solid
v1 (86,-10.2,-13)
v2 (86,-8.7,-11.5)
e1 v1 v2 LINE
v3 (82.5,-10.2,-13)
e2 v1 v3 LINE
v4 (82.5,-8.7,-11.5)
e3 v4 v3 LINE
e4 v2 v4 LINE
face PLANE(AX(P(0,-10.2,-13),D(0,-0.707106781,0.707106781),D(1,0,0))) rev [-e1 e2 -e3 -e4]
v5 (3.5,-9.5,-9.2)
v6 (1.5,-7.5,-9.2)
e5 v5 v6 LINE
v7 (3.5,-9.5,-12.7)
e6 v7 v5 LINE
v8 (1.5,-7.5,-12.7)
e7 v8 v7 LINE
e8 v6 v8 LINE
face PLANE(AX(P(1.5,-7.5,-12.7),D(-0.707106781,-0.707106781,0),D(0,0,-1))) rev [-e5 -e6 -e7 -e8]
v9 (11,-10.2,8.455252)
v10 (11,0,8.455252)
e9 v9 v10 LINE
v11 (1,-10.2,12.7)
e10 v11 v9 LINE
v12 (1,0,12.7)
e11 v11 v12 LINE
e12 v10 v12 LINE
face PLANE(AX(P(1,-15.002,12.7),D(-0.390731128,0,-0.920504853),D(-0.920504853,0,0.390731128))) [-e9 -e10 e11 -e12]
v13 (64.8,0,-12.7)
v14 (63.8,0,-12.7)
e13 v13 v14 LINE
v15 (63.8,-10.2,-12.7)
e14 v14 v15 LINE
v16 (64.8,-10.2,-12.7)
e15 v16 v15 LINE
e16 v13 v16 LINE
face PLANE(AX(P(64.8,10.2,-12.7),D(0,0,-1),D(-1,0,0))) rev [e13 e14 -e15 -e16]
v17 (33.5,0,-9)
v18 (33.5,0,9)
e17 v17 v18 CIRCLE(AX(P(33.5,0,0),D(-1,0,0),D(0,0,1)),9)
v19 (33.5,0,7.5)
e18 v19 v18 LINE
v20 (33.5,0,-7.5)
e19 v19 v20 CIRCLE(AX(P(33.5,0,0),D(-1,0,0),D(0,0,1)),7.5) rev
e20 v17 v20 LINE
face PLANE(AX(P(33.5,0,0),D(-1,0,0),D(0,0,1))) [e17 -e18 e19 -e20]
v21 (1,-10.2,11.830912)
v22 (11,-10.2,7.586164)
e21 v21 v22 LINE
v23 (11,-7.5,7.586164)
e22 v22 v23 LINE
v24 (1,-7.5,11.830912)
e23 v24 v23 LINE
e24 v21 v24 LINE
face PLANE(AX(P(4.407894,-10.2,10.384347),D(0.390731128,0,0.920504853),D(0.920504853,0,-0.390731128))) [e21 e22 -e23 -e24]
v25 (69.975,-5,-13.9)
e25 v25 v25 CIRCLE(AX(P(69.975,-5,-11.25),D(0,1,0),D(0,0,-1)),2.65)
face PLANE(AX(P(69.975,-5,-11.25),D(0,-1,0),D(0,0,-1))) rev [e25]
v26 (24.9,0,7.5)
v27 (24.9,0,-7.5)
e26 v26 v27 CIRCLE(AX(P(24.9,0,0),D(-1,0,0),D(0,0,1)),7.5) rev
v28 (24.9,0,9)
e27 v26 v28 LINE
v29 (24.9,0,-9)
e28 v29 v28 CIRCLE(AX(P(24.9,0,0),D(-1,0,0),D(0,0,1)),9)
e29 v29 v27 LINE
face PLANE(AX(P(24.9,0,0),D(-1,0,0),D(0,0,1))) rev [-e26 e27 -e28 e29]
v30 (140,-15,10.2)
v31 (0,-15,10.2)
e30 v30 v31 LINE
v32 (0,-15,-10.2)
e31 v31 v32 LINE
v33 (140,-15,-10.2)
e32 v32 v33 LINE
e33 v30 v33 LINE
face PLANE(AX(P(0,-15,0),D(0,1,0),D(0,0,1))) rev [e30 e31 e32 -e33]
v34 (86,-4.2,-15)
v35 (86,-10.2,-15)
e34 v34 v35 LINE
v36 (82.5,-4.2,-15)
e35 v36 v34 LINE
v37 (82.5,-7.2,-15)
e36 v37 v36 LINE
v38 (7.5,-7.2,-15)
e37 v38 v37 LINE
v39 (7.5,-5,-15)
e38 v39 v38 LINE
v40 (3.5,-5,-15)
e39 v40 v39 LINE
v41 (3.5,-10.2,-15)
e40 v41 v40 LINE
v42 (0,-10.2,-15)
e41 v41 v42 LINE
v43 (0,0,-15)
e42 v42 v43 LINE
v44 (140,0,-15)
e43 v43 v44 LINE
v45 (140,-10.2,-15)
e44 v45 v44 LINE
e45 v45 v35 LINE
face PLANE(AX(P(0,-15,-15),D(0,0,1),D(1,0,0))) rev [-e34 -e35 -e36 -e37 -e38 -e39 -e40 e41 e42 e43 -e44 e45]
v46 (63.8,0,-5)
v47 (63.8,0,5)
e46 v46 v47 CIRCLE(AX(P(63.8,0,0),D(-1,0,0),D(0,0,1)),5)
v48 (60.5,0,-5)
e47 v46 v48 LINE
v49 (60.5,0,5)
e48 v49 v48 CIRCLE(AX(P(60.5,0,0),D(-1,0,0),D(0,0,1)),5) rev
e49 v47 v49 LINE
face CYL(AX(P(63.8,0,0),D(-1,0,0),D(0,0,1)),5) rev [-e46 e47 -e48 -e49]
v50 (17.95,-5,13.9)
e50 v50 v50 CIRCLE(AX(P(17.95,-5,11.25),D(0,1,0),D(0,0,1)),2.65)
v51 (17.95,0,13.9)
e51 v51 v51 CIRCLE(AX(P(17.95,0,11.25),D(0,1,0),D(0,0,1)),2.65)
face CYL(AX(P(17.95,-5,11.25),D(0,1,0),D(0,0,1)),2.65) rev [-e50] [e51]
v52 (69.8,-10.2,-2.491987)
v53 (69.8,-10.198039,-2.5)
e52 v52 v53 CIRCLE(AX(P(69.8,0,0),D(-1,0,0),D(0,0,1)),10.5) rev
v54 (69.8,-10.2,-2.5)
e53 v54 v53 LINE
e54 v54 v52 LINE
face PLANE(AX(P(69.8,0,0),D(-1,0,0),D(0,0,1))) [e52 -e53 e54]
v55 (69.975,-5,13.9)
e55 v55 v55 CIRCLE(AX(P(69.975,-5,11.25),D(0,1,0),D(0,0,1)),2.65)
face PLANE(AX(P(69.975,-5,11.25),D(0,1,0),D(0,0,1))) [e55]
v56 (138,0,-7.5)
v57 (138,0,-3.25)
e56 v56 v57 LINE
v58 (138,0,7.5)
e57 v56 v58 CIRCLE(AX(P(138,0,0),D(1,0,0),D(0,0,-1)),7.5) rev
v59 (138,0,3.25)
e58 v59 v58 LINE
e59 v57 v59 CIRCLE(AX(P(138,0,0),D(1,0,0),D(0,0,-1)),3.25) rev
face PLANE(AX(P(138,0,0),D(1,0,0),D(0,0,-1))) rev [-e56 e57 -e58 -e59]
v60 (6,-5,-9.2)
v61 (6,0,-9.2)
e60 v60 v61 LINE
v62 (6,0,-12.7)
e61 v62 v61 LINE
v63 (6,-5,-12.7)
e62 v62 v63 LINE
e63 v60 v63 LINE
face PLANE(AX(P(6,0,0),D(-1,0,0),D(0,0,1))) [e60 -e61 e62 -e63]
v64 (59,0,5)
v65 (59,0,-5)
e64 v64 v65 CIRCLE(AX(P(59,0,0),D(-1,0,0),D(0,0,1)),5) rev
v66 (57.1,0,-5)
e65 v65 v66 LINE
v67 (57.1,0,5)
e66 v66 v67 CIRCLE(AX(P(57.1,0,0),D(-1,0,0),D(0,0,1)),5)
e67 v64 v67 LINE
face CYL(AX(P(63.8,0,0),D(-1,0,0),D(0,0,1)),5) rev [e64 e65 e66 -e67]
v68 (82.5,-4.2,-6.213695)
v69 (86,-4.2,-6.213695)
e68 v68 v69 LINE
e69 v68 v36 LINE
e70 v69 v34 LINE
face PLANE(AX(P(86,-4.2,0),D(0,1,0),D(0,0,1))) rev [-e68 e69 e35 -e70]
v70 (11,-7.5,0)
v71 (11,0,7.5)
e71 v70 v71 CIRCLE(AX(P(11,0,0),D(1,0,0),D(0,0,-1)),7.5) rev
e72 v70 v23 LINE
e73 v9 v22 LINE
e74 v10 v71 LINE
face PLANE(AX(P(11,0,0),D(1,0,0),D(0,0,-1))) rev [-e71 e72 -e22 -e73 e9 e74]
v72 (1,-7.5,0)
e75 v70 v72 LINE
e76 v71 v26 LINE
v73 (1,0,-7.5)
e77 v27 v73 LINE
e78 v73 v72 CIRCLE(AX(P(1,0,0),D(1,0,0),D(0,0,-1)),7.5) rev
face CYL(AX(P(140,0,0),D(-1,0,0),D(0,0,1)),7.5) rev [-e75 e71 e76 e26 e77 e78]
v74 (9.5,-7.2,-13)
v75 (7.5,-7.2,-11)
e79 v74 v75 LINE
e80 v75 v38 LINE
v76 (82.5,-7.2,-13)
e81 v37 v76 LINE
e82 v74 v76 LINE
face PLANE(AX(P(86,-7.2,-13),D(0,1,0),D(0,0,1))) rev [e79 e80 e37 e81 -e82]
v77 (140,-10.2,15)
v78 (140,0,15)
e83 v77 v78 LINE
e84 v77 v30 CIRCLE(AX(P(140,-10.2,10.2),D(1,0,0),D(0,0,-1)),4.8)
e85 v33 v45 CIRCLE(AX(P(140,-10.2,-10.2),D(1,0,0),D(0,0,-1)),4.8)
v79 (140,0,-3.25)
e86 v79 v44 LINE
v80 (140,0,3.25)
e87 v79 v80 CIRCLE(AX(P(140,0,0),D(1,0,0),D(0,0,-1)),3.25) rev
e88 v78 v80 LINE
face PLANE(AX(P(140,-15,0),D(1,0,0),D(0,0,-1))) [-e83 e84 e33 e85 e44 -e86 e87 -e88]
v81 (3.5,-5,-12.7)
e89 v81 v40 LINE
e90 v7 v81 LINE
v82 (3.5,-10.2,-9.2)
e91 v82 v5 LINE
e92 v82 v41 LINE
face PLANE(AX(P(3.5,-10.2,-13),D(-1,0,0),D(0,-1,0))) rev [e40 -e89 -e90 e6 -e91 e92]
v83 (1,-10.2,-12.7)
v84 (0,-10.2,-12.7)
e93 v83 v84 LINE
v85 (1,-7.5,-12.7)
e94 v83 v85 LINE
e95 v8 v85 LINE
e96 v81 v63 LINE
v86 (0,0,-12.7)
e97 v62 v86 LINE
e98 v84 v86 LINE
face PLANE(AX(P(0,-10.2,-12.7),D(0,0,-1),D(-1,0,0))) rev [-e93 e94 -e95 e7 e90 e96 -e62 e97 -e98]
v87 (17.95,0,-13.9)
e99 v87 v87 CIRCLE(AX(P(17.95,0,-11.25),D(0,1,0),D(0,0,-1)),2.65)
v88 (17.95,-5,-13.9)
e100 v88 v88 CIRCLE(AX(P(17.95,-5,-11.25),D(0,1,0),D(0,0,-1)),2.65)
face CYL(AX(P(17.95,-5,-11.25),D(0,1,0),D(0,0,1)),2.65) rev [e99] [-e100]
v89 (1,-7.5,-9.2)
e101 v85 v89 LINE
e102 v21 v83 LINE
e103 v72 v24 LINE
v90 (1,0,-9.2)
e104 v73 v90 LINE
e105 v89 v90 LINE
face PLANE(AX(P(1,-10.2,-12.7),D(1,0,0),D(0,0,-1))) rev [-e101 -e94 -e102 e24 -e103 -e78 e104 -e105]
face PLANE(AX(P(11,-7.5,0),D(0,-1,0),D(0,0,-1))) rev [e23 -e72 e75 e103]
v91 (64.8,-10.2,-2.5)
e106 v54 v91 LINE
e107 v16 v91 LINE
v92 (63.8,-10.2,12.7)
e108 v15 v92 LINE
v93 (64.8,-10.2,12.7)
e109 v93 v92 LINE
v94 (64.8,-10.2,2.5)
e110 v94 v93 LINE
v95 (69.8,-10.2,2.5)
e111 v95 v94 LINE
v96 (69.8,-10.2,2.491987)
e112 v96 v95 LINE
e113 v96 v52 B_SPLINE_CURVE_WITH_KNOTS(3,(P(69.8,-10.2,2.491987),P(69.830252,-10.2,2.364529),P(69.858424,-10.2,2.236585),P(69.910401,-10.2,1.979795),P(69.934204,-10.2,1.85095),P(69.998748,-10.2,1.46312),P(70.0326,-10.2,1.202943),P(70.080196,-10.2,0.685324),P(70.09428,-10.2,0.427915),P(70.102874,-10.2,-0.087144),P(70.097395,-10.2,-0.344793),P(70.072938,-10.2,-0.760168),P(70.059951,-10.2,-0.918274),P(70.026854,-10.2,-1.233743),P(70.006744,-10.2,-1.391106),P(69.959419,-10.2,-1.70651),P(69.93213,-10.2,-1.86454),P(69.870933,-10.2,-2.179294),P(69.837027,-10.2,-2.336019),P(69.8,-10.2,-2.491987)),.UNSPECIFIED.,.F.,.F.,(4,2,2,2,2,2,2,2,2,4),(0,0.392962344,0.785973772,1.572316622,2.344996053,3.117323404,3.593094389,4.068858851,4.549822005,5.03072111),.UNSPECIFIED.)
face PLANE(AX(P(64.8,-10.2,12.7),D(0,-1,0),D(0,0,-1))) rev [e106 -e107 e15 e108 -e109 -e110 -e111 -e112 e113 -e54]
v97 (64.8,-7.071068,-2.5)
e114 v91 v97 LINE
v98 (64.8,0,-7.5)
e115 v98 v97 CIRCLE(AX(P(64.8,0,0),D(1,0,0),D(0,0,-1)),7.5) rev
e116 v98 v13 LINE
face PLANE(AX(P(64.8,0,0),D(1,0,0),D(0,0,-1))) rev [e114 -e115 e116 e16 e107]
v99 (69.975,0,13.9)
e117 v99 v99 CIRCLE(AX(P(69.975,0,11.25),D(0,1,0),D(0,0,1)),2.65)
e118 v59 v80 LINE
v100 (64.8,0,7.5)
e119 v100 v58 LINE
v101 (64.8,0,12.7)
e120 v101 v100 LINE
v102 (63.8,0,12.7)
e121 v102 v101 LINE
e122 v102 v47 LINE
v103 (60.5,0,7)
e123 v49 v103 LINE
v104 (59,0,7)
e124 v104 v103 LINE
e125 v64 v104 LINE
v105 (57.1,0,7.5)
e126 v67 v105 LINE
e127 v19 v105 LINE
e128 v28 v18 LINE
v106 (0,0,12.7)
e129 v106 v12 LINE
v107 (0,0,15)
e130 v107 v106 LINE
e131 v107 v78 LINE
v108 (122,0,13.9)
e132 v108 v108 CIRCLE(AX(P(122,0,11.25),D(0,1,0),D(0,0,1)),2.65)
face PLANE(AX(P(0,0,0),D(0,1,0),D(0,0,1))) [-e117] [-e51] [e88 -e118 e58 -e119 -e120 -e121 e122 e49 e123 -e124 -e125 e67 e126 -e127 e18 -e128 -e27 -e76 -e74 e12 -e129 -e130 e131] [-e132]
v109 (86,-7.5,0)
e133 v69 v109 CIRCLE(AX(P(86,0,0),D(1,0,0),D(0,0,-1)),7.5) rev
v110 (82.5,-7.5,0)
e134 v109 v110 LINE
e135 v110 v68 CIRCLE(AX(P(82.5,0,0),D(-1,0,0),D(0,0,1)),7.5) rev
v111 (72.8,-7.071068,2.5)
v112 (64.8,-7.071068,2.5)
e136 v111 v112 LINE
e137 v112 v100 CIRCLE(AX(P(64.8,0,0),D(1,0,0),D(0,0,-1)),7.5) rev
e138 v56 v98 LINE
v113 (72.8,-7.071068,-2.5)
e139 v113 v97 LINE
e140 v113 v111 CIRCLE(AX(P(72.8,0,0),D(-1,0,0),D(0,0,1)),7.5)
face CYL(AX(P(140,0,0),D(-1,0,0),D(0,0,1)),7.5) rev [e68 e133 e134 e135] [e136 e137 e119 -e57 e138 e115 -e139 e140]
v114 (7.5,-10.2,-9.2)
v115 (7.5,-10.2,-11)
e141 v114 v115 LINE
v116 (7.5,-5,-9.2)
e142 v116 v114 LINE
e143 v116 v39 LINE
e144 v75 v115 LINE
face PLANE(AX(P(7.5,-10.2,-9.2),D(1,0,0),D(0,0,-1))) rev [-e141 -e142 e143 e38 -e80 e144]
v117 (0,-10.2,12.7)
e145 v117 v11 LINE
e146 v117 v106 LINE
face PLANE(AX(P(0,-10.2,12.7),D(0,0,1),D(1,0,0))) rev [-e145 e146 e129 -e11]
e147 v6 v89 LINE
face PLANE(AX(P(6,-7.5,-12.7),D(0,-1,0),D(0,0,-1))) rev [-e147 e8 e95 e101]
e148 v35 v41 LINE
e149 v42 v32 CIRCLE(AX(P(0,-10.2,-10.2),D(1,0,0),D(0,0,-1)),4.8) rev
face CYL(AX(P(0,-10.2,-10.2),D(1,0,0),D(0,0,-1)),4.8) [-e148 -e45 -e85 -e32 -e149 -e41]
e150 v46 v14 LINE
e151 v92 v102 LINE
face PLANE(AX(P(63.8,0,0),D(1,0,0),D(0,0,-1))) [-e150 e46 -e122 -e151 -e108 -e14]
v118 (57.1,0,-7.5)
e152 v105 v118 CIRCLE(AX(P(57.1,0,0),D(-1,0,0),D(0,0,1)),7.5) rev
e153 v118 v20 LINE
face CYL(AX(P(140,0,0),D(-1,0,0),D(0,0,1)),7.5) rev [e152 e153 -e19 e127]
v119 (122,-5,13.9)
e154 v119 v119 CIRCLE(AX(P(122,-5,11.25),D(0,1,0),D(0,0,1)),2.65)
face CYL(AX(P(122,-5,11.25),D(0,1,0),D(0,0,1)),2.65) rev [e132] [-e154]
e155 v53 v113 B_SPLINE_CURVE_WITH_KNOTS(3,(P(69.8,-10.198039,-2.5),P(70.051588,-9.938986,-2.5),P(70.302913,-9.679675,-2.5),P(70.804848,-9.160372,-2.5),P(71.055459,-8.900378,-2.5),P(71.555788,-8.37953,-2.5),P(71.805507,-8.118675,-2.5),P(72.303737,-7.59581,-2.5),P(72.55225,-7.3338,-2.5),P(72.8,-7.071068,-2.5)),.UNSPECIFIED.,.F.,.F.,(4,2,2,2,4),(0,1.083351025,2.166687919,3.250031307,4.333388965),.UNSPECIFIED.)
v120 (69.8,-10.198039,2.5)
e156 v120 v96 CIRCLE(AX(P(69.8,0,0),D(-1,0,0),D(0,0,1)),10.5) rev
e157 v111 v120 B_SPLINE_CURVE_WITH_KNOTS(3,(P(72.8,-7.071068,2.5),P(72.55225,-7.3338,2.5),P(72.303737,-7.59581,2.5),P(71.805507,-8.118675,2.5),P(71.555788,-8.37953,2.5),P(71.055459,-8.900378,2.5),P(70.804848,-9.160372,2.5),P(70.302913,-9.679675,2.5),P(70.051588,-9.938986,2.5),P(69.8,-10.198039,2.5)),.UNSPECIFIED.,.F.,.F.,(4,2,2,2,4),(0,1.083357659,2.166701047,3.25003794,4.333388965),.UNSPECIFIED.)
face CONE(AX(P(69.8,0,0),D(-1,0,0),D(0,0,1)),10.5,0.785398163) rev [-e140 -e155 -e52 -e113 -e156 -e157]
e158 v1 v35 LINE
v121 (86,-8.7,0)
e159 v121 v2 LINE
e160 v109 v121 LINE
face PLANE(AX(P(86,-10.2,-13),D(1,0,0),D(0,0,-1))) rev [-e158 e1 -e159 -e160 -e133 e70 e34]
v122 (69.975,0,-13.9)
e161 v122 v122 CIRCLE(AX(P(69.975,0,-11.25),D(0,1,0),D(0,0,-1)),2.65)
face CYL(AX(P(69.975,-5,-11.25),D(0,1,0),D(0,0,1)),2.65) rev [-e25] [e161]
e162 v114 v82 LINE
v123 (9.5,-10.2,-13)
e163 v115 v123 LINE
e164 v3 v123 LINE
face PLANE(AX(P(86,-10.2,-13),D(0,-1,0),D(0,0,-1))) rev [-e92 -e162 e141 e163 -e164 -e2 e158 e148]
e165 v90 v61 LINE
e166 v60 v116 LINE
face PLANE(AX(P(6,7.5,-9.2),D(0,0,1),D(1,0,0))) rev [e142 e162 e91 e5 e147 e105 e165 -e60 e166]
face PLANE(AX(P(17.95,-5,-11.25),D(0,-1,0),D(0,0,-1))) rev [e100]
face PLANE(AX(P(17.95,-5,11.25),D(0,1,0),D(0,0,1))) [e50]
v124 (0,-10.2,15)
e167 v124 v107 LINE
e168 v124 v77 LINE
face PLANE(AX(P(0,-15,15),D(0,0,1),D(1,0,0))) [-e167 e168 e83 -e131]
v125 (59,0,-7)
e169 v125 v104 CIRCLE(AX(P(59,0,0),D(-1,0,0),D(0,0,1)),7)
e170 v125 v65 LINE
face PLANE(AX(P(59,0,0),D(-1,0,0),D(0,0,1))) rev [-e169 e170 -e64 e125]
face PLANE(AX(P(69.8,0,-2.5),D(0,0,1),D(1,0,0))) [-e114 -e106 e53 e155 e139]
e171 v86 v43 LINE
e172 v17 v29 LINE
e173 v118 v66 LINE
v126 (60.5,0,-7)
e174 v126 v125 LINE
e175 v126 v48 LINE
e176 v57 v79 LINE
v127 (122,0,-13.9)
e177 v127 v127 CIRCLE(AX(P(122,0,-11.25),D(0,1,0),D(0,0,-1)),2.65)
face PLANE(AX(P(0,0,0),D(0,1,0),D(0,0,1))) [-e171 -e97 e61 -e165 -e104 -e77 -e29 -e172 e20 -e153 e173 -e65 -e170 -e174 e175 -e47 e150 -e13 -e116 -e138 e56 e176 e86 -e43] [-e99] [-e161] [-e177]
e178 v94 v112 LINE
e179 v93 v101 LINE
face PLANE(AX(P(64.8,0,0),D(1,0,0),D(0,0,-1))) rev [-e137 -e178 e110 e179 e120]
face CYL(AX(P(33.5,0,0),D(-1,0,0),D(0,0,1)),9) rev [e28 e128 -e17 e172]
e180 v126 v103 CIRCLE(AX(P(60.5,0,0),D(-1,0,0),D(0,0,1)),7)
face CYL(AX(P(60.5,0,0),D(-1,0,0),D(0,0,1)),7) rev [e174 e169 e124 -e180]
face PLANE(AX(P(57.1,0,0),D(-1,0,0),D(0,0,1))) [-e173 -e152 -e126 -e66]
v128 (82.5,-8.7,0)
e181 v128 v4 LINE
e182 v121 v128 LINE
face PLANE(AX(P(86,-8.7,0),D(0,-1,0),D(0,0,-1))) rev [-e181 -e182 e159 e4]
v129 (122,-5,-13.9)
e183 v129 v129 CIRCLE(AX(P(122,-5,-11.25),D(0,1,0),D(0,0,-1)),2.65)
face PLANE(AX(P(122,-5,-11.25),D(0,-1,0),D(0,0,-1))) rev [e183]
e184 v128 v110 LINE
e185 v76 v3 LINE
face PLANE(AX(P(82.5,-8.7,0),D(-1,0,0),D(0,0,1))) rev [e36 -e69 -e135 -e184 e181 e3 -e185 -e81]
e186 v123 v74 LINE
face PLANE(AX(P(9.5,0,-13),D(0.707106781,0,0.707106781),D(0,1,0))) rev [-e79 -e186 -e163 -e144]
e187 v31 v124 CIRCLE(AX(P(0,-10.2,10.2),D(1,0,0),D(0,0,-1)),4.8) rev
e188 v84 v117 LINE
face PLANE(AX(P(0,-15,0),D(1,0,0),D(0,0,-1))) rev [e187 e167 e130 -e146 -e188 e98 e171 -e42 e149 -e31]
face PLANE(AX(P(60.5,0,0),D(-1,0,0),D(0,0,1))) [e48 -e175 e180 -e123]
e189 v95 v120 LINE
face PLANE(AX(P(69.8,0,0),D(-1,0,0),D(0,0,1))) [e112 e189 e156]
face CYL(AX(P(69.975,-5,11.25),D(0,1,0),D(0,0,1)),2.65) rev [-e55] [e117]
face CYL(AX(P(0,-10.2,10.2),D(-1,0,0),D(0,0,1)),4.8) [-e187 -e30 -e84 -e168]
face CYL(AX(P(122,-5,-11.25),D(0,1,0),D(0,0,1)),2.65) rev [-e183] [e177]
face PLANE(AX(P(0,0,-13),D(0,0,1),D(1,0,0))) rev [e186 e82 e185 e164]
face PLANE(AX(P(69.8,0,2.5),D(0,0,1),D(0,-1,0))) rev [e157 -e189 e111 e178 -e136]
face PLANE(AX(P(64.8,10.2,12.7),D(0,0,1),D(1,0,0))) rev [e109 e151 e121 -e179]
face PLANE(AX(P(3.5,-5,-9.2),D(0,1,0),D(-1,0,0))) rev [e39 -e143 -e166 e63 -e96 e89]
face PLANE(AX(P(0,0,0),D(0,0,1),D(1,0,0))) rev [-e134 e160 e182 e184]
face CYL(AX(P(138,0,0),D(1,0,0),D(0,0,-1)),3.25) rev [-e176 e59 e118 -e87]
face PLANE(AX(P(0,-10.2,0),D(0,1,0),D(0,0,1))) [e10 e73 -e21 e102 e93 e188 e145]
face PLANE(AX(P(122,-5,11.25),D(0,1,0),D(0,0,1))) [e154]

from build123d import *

# Parameters (mm, degrees)
SKETCH2_W             = 140
SKETCH2_H             = 15
BASE_DEPTH            = 15
SKETCH3_R             = 7.5
CENTER_CUT_DEPTH      = 142.598022585
SKETCH4_W             = 1
SKETCH4_H             = 25.4
ANTENNA_PCB_DEPTH     = 10.2
SKETCH11_W            = 3.5
SKETCH11_H            = 15
COAX_CONNECTOR_DEPTH  = 5
LENS_START            = -23.9
SKETCH8_R             = 9
LENS_DEPTH            = 8.6
FILLET1_R             = 4.8
SKETCH17_W            = 82.5
SKETCH17_H            = 3
CUT_EXTRUDE4_DEPTH    = 2
SKETCH19_W            = 4
SKETCH19_H            = 5.2
CUT_EXTRUDE5_DEPTH    = 5.8
SKETCH21_W            = 3.5
SKETCH21_H            = 4.5
CUT_EXTRUDE6_DEPTH    = 15
FILLET7_SIZE          = 1.5
COAX_CABLE_HOLE_START = -2
COAX_CABLE_HOLE_DEPTH = 2
SKETCH23_W            = 12.7
SKETCH23_H            = 7.5
CUT_EXTRUDE7_DEPTH    = 10
BOSS_EXTRUDE1_REACH   = 143.598
CUT_EXTRUDE10_DEPTH   = 2.7
SKETCH31_R            = 2.65
MOUNTING_HOLES_DEPTH  = 5
FILLET11_SIZE         = 2
PHOTODIODE_PCB_START  = -62.8
SKETCH10_W            = 25.4
SKETCH10_H            = 20.4
PHOTODIODE_PCB_DEPTH  = 1
CUT_EXTRUDE13_DEPTH   = 5
CHAMFER2_SIZE         = 3
FILTER_MOUNT_START    = -56.1
FILTER_MOUNT_DEPTH    = 6.7
FILTER_SPACE_START    = -58
SKETCH36_R            = 7
FILTER_SPACE_DEPTH    = 1.5


# Some blends are built 0.0001 mm under size
with BuildPart() as part:
    # Sketch2 → Base (new body)
    with BuildSketch(Plane(origin=(0, 0, 0), x_dir=(1, 0, 0), z_dir=(0, 1, 0))):
        with Locations((70, -7.5)):
            Rectangle(SKETCH2_W, SKETCH2_H)
        with Locations((70, 7.5)):
            Rectangle(SKETCH2_W, SKETCH2_H)
    extrude(amount=-BASE_DEPTH)

    # Sketch3 → Center_cut (cut, through all)
    with BuildSketch(Plane.ZY):
        Circle(SKETCH3_R)
    extrude(amount=-CENTER_CUT_DEPTH, mode=Mode.SUBTRACT)

    # Sketch4 → Antenna_PCB (cut)
    with BuildSketch(Plane(origin=(0, 0, 0), x_dir=(1, 0, 0), z_dir=(0, 1, 0))):
        with Locations((0.5, 0)):
            Rectangle(SKETCH4_W, SKETCH4_H)
    extrude(amount=-ANTENNA_PCB_DEPTH, mode=Mode.SUBTRACT)

    # Sketch11 → Coax_connector (cut)
    with BuildSketch(Plane.ZY.offset(-1)):
        with Locations((-10.95, 0)):
            Rectangle(SKETCH11_W, SKETCH11_H)
    extrude(amount=-COAX_CONNECTOR_DEPTH, mode=Mode.SUBTRACT)

    # Sketch8 → Lens (cut)
    with BuildSketch(Plane.ZY.offset(-1).offset(LENS_START)):
        Circle(SKETCH8_R)
    extrude(amount=-LENS_DEPTH, mode=Mode.SUBTRACT)

    # Fillet1
    fillet1_edges = [part.edges().sort_by_distance(p)[0] for p in [
        (70, -15, -15),
        (70, -15, 15),
    ]]
    fillet(fillet1_edges, radius=FILLET1_R)

    # Sketch17 → Cut-Extrude4 (cut)
    with BuildSketch(Plane(origin=(0, 0, -15), x_dir=(-1, 0, 0), z_dir=(0, 0, -1))):
        with Locations((-44.75, -8.7)):
            Rectangle(SKETCH17_W, SKETCH17_H)
    extrude(amount=-CUT_EXTRUDE4_DEPTH, mode=Mode.SUBTRACT)

    # Sketch19 → Cut-Extrude5 (cut)
    with BuildSketch(Plane(origin=(0, 0, -15), x_dir=(-1, 0, 0), z_dir=(0, 0, -1))):
        with Locations((-5.5, -7.6)):
            Rectangle(SKETCH19_W, SKETCH19_H)
    extrude(amount=-CUT_EXTRUDE5_DEPTH, mode=Mode.SUBTRACT)

    # Sketch21 → Cut-Extrude6 (cut)
    with BuildSketch(Plane(origin=(0, 0, -15), x_dir=(-1, 0, 0), z_dir=(0, 0, -1))):
        with Locations((-84.25, -6.45)):
            Rectangle(SKETCH21_W, SKETCH21_H)
    extrude(amount=-CUT_EXTRUDE6_DEPTH, mode=Mode.SUBTRACT)

    # Fillet7
    fillet7_edges = [part.edges().sort_by_distance(p)[0] for p in [
        (84.25, -8.7, -13),
    ]]
    chamfer(fillet7_edges, length=FILLET7_SIZE - 0.0001)  # a hair under: the kernel refuses the full size

    # Sketch22 → Coax_cable_hole (add)
    with BuildSketch(Plane(origin=(140, 0, 0), x_dir=(0, 0, -1), z_dir=(1, 0, 0)).offset(COAX_CABLE_HOLE_START)):
        with BuildLine():
            ThreePointArc((-7.5, 0), (0, -7.5), (7.5, 0))
            Line((7.5, 0), (3.25, 0))
            ThreePointArc((3.25, 0), (0, -3.25), (-3.25, 0))
            Line((-3.25, 0), (-7.5, 0))
        make_face()
        with BuildLine():
            Line((11.25, -8), (11.25, 0))
            Line((11.25, 0), (7.5, 0))
            ThreePointArc((7.5, 0), (0, -7.5), (-7.5, 0))
            Line((-7.5, 0), (-11.25, 0))
            Line((-11.25, 0), (-11.25, -8))
            Line((-11.25, -8), (11.25, -8))
        make_face()
    extrude(amount=COAX_CABLE_HOLE_DEPTH)

    # Sketch23 → Cut-Extrude7 (cut)
    with BuildSketch(Plane.ZY.offset(-1)):
        with Locations((6.35, -3.75)):
            Rectangle(SKETCH23_W, SKETCH23_H)
    extrude(amount=-CUT_EXTRUDE7_DEPTH, mode=Mode.SUBTRACT)

    # Sketch24 → Boss-Extrude1 (add, up to next)
    with BuildSketch(Plane(origin=(0, 0, 0), x_dir=(1, 0, 0), z_dir=(0, 1, 0)), mode=Mode.PRIVATE) as boss_extrude1_sk1:
        Polygon((1, -12.7), (11, -8.455251838), (11, -12.7), align=None)
    boss_extrude1_tool1 = extrude(boss_extrude1_sk1.sketch, amount=-BOSS_EXTRUDE1_REACH, mode=Mode.PRIVATE) - part.part
    add(boss_extrude1_tool1.solids().sort_by_distance((7.666667, 0, 11.285084))[0])

    # Sketch27 → Cut-Extrude10 (cut)
    with BuildSketch(Plane(origin=(0, -7.5, 0), x_dir=(1, 0, 0), z_dir=(0, 1, 0))):
        Polygon((10.687415097, -7.718847955), (11, -8.455251838), (11, -7.586163536), align=None)
        Polygon((1, -12.7), (11, -8.455251838), (10.687415097, -7.718847955), (1, -11.830911698), align=None)
    extrude(amount=-CUT_EXTRUDE10_DEPTH, mode=Mode.SUBTRACT)

    # Sketch31 → Mounting_holes (cut)
    with BuildSketch(Plane(origin=(0, 0, 0), x_dir=(1, 0, 0), z_dir=(0, 1, 0))):
        with Locations(Location((17.95, -11.25, 0), (0, 0, 270))):
            Circle(SKETCH31_R)
        with Locations(Location((122, -11.25, 0), (0, 0, 270))):
            Circle(SKETCH31_R)
        with Locations(Location((122, 11.25, 0), (0, 0, 90))):
            Circle(SKETCH31_R)
        with Locations(Location((17.95, 11.25, 0), (0, 0, 90))):
            Circle(SKETCH31_R)
        with Locations(Location((69.975, -11.25, 0), (0, 0, 270))):
            Circle(SKETCH31_R)
        with Locations(Location((69.975, 11.25, 0), (0, 0, 90))):
            Circle(SKETCH31_R)
    extrude(amount=-MOUNTING_HOLES_DEPTH, mode=Mode.SUBTRACT)

    # Fillet11
    fillet11_edges = [part.edges().sort_by_distance(p)[0] for p in [
        (7.5, -8.7, -13),
        (3.5, -7.5, -10.95),
    ]]
    chamfer(fillet11_edges, length=FILLET11_SIZE)

    # Sketch10 → Photodiode_PCB (cut)
    with BuildSketch(Plane.ZY.offset(-1).offset(PHOTODIODE_PCB_START)):
        Rectangle(SKETCH10_W, SKETCH10_H)
    extrude(amount=-PHOTODIODE_PCB_DEPTH, mode=Mode.SUBTRACT)

    # Sketch33 → Cut-Extrude13 (cut)
    with BuildSketch(Plane.ZY.offset(-64.8)):
        with BuildLine():
            Line((-2.5, -10.2), (0, -10.2))
            Line((0, -10.2), (0, -7.5))
            ThreePointArc((0, -7.5), (-1.26826484, -7.391989197), (-2.5, -7.071067812))
            Line((-2.5, -7.071067812), (-2.5, -10.2))
        make_face()
        with BuildLine():
            Line((0, -10.2), (2.5, -10.2))
            Line((2.5, -10.2), (2.5, -7.071067812))
            ThreePointArc((2.5, -7.071067812), (1.26826484, -7.391989197), (0, -7.5))
            Line((0, -7.5), (0, -10.2))
        make_face()
    extrude(amount=-CUT_EXTRUDE13_DEPTH, mode=Mode.SUBTRACT)

    # Chamfer2
    # the kernel refuses this chamfer: 3 mm, written as the material it takes off along each edge
    with BuildSketch(Plane(origin=(69.8, 0, 0), x_dir=(0, -0.2008336879156208, 0.9796253517535216), z_dir=(0, 0.9796253517535216, 0.2008336879156208))) as chamfer2_piece_1_section:
        Polygon((7.5, CHAMFER2_SIZE), (7.5 + CHAMFER2_SIZE, 0), (7.5, 0), align=None)
    chamfer2_piece_1 = revolve(axis=Axis((69.8, 0, 0), (1, 0, 0)), revolution_arc=156.828569884, mode=Mode.PRIVATE)
    chamfer2_piece_1 = split(chamfer2_piece_1, bisect_by=Plane(origin=(70.802116042, -8.337432159, -2.5), z_dir=(0, 0, 1)), keep=Keep.TOP, mode=Mode.PRIVATE)
    chamfer2_piece_1 = split(chamfer2_piece_1, bisect_by=Plane(origin=(70.802116042, -10.2, 0), z_dir=(0, 1, 0)), keep=Keep.TOP, mode=Mode.PRIVATE)
    chamfer2_piece_1 = split(chamfer2_piece_1, bisect_by=Plane(origin=(70.802116042, -8.337432159, 2.5), z_dir=(0, 0, -1)), keep=Keep.TOP, mode=Mode.PRIVATE)
    add(chamfer2_piece_1, mode=Mode.SUBTRACT)

    # Sketch35 → Filter_mount (add)
    with BuildSketch(Plane.ZY.offset(-1).offset(FILTER_MOUNT_START)):
        with BuildLine():
            Line((-5, 0), (-7.5, 0))
            ThreePointArc((-7.5, 0), (-5.303300859, -5.303300859), (0, -7.5))
            ThreePointArc((0, -7.5), (5.303300859, -5.303300859), (7.5, 0))
            Line((7.5, 0), (5, 0))
            ThreePointArc((5, 0), (0, -5), (-5, 0))
        make_face()
    extrude(amount=-FILTER_MOUNT_DEPTH)

    # Sketch36 → Filter_space (cut)
    with BuildSketch(Plane.ZY.offset(-1).offset(FILTER_SPACE_START)):
        Circle(SKETCH36_R)
    extrude(amount=-FILTER_SPACE_DEPTH, mode=Mode.SUBTRACT)


solid = part.part
